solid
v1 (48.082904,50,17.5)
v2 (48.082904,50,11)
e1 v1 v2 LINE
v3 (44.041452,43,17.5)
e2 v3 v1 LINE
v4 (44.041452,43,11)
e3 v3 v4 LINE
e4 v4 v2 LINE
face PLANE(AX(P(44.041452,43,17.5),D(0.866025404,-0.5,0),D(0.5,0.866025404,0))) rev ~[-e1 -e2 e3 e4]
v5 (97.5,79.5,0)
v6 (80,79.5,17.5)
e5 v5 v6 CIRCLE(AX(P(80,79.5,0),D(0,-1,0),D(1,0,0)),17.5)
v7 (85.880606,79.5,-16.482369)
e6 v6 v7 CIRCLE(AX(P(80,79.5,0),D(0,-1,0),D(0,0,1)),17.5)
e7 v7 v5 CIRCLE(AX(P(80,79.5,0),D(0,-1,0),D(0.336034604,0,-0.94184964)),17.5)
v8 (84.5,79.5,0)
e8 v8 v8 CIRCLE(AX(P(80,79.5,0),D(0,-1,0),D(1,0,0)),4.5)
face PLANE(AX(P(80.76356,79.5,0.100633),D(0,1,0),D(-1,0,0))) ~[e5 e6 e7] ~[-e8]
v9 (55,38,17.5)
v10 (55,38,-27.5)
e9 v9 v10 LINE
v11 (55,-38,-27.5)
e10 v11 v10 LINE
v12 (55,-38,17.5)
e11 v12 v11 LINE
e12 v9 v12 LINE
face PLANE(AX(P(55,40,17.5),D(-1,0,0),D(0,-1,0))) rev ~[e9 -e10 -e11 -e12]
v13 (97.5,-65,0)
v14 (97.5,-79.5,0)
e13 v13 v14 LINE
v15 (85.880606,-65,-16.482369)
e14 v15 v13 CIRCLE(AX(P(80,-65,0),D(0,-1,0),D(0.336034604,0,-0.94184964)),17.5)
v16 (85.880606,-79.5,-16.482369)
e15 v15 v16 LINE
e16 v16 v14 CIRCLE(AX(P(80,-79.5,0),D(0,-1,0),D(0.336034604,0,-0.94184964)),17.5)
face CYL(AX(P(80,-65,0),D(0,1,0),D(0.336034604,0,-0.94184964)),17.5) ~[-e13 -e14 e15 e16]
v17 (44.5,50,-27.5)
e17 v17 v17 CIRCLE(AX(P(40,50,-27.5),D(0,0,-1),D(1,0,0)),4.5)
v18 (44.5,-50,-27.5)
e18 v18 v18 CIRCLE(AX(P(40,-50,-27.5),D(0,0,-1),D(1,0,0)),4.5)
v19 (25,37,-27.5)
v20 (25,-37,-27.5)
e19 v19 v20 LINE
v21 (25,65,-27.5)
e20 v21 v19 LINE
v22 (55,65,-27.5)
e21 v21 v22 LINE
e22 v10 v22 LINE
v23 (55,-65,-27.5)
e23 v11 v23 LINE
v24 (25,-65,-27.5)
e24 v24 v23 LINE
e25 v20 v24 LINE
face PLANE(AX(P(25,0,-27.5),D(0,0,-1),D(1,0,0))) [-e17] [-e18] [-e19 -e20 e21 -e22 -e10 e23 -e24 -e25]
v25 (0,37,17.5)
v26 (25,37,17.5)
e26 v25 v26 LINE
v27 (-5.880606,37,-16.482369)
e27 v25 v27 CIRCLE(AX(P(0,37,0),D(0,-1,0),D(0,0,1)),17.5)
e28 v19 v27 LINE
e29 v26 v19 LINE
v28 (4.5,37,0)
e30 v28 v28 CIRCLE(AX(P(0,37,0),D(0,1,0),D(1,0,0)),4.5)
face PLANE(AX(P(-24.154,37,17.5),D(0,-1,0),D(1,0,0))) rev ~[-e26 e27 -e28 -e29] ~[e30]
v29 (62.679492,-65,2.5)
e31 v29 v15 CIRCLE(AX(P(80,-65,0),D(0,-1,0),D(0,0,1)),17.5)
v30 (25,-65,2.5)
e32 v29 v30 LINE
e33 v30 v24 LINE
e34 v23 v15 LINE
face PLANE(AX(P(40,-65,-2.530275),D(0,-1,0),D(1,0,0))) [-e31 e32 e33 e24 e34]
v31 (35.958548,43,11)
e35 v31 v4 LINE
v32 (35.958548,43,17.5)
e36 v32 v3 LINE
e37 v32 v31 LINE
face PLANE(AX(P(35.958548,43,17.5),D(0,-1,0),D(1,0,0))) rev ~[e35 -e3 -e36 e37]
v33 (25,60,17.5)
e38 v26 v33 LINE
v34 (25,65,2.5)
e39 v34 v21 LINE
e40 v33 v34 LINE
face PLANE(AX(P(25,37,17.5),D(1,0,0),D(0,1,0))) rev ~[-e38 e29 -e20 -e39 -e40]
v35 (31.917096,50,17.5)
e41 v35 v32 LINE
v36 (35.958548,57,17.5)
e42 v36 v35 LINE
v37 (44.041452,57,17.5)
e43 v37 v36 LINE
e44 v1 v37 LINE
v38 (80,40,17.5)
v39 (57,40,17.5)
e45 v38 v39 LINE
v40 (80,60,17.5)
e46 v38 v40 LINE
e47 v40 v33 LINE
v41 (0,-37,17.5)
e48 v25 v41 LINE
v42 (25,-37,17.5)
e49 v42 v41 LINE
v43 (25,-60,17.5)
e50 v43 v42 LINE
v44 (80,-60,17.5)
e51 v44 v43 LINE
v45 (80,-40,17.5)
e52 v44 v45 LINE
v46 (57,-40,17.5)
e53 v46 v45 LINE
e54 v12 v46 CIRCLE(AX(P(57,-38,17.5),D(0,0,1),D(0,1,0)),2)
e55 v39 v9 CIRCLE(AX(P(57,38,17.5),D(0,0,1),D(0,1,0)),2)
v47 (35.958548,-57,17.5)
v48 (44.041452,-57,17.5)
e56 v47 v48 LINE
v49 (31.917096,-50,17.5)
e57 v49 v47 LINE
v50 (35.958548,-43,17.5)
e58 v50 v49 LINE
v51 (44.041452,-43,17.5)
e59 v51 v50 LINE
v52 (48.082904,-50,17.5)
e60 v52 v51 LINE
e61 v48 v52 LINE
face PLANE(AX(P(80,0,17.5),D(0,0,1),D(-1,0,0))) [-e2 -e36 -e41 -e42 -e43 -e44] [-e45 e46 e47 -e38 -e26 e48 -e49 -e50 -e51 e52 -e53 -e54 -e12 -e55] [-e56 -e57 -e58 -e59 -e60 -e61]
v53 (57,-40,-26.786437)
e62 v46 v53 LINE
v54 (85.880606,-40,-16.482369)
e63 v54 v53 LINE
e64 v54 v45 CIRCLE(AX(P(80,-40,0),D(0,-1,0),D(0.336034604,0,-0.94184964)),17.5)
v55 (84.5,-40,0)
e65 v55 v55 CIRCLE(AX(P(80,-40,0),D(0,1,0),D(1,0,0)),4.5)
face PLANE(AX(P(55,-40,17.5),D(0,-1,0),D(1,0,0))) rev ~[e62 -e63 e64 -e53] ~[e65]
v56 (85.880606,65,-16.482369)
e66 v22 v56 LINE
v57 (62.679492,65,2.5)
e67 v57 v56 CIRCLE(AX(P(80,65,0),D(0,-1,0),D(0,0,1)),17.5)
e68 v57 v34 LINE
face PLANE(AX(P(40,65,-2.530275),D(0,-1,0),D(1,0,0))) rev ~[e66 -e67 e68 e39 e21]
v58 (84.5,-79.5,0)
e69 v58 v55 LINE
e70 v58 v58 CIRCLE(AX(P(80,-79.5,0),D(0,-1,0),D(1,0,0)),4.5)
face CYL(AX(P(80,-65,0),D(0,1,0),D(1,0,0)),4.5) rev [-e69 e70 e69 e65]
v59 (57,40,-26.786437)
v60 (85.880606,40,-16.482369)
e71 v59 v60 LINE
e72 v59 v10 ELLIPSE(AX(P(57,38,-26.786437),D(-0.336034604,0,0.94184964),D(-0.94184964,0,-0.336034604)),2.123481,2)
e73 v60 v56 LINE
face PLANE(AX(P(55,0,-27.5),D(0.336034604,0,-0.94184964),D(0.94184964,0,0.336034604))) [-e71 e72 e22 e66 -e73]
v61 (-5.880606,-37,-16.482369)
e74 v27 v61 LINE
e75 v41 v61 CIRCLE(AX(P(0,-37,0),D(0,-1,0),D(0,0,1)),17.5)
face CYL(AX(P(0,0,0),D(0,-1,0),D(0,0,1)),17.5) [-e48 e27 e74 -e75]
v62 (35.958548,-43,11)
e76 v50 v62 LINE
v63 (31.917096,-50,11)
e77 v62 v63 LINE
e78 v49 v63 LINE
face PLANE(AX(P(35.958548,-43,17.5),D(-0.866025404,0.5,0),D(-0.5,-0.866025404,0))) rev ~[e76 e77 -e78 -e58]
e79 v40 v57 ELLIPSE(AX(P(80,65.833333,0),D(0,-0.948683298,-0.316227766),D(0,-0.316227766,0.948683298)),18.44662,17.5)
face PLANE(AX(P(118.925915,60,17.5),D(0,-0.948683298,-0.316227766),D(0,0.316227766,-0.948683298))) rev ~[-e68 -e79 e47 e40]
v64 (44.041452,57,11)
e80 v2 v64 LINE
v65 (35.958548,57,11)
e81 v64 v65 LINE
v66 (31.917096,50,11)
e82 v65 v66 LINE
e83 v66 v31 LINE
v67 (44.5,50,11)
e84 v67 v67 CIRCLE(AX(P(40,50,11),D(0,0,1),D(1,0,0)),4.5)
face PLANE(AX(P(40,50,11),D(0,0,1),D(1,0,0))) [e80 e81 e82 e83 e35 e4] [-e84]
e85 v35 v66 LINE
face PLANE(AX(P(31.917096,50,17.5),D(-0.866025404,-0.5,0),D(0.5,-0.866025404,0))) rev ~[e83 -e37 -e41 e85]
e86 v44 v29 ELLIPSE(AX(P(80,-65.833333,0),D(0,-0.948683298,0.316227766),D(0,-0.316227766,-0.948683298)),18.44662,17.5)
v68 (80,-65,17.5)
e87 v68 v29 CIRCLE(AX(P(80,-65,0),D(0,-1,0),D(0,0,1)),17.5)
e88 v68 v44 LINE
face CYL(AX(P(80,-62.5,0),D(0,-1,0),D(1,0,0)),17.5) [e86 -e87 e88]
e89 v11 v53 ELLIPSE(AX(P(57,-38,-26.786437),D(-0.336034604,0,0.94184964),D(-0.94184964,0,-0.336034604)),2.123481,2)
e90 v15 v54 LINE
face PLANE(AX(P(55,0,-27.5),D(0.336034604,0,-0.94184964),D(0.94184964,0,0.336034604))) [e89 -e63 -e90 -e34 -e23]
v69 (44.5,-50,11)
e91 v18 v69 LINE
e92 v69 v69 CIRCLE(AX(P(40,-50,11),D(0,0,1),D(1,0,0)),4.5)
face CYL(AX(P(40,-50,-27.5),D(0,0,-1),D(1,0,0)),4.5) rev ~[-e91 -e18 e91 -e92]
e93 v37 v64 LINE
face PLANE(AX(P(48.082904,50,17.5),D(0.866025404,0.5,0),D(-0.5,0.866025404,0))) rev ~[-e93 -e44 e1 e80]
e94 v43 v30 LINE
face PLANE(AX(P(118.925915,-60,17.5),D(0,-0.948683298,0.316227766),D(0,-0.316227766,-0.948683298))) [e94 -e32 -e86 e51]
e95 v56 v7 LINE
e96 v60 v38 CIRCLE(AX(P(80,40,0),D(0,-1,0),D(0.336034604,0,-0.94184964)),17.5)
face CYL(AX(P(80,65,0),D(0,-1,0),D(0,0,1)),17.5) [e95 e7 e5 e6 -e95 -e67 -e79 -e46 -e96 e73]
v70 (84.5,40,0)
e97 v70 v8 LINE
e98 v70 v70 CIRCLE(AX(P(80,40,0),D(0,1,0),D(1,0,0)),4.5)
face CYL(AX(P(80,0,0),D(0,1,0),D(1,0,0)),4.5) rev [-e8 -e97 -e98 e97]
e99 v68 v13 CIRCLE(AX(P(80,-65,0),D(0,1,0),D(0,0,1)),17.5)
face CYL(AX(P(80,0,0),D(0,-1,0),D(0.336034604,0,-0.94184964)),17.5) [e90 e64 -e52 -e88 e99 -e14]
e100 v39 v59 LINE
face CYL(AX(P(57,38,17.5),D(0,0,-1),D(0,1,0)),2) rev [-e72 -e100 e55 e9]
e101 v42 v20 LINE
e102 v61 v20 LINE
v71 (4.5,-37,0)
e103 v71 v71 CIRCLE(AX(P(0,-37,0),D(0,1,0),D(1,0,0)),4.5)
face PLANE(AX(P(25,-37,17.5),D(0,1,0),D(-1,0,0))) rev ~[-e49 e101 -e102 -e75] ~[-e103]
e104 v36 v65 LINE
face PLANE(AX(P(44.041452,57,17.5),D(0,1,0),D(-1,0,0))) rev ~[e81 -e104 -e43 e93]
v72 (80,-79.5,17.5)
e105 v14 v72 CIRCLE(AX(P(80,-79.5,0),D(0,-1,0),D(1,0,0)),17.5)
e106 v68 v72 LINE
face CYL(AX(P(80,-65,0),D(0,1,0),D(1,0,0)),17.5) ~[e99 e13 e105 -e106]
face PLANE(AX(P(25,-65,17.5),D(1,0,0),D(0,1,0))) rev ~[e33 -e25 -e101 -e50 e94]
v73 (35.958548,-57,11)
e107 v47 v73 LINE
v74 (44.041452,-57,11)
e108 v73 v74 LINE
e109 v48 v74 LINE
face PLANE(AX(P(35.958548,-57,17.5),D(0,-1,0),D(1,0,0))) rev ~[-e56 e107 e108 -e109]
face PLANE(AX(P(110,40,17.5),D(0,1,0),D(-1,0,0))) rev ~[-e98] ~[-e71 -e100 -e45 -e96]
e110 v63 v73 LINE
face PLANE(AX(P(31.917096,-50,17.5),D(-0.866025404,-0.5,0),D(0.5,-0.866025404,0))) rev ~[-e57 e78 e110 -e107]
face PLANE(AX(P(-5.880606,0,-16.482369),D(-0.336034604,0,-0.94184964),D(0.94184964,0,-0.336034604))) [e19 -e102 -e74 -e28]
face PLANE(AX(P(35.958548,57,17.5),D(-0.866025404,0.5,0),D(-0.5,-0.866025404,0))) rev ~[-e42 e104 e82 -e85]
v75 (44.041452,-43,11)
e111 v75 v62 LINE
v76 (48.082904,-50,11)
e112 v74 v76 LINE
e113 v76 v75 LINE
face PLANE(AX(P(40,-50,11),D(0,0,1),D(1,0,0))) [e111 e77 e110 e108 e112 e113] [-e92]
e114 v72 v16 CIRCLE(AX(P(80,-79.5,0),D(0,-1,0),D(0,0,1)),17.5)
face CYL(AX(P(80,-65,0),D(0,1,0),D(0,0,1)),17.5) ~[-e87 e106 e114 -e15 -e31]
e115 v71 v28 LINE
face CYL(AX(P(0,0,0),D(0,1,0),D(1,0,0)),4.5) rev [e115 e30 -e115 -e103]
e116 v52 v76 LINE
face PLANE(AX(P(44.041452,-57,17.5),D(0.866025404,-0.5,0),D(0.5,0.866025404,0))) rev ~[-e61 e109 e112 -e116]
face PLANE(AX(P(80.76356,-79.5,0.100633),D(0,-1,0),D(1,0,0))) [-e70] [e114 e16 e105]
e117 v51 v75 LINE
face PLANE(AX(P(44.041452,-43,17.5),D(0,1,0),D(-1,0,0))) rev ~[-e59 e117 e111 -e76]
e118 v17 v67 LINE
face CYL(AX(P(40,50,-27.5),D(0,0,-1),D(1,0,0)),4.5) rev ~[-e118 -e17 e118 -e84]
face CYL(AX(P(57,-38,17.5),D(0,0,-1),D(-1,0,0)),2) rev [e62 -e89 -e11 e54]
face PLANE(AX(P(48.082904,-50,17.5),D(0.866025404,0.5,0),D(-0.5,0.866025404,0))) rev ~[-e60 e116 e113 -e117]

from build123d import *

# Parameters (mm, degrees)
F0_R          = 4.5
F1_DEPTH      = 65
F2_W          = 24.1539999843
F2_H          = 28
F2_W_2        = 25
F2_W_3        = 30
F2_H_2        = 80
F3_DEPTH      = 45.001
F4_R          = 4.5
F5_DEPTH      = 45.001
F6_R          = 4.5
F7_DEPTH      = 6.5
F8_R          = 4.5
F9_DEPTH      = 14.5
F10_T4_DEPTH  = 132.8518303197
F10_S5_R      = 17.5
F10_T6_DEPTH  = 68
F10_T10_DEPTH = 132.8518303197
F10_S11_R     = 17.5
F10_T12_DEPTH = 68
F11_R         = 2


# Not quite as in the source:
# - a fillet or chamfer that OpenCascade refuses, or shapes differently, is made with other operations: its cross-section is extruded or revolved along the edge and cut away or added
# - a pattern or mirror of a feature is missing from the dataset's text; its kind, count and spacing are read off the source's solid


with BuildPart() as f1:
    # F0 (on Front) → F1 (new body, symmetric)
    with BuildSketch(Plane.XZ):
        with BuildLine():
            Line((80, 17.5), (0, 17.5))
            ThreePointArc((0, 17.5), (-17.2437155554, 2.9840029898), (-5.880605574, -16.4823687036))
            Line((-5.880605574, -16.4823687036), (25, -27.5))
            Line((25, -27.5), (55, -27.5))
            Line((55, -27.5), (85.880605574, -16.4823687036))
            ThreePointArc((85.880605574, -16.4823687036), (97.2437155554, 2.9840029898), (80, 17.5))
        make_face()
        Circle(F0_R, mode=Mode.SUBTRACT)
        with Locations((80, 0)):
            Circle(F0_R, mode=Mode.SUBTRACT)
    extrude(amount=F1_DEPTH, both=True)

    # F2 (on face) → F3 (cut, through all)
    with BuildSketch(Plane.XY.offset(17.5)):
        with Locations((-12.0769999921, 51)):
            Rectangle(F2_W, F2_H)
        with Locations((12.5, 51)):
            Rectangle(F2_W_2, F2_H)
        with Locations((-12.0769999921, -51)):
            Rectangle(F2_W, F2_H)
        with Locations((12.5, -51)):
            Rectangle(F2_W_2, F2_H)
        Polygon((55, 40), (55, 0), (55, -40), (80, -40), (80, 40), align=None)
        with Locations((95, 0)):
            Rectangle(F2_W_3, F2_H_2)
    extrude(amount=-F3_DEPTH, mode=Mode.SUBTRACT)

    # F4 (on face) → F5 (cut, through all)
    with BuildSketch(Plane(origin=(0, 0, -27.5), x_dir=(1, 0, 0), z_dir=(0, 0, -1))):
        with Locations((40, 50)):
            Circle(F4_R)
        with Locations((40, -50)):
            Circle(F4_R)
    extrude(amount=-F5_DEPTH, mode=Mode.SUBTRACT)

    # F6 (on face) → F7 (cut)
    with BuildSketch(Plane.XY.offset(17.5)):
        Polygon((35.9585481157, 43), (44.0414518843, 43), (48.0829037687, 50), (44.0414518843, 57), (35.9585481157, 57), (31.9170962313, 50), align=None)
        with Locations((40, 50)):
            Circle(F6_R, mode=Mode.SUBTRACT)
        Polygon((44.0414518843, -57), (48.0829037687, -50), (44.0414518843, -43), (35.9585481157, -43), (31.9170962313, -50), (35.9585481157, -57), align=None)
        with Locations((40, -50)):
            Circle(F6_R, mode=Mode.SUBTRACT)
    extrude(amount=-F7_DEPTH, mode=Mode.SUBTRACT)

    # F8 (on face) → F9 (join)
    with BuildSketch(Plane.XZ.offset(65)):
        with BuildLine():
            ThreePointArc((85.880605574, -16.4823687036), (94.3031569513, -10.0831394529), (97.5, 0))
            ThreePointArc((97.5, 0), (92.3743686708, 12.3743686708), (80, 17.5))
            ThreePointArc((80, 17.5), (62.7562844446, -2.9840029898), (85.880605574, -16.4823687036))
        make_face()
        with Locations((80, 0)):
            Circle(F8_R, mode=Mode.SUBTRACT)
    f9 = extrude(amount=F9_DEPTH)

    # F9_copies: F9 across plane
    add(f9.mirror(Plane.ZX))

    # F10: chamfer of 5 x 15 on 2 edges, made by hand


with BuildPart() as f10_tool2:
    # F10_s3 → F10_t4 (new body)
    with BuildSketch(Plane.YZ.offset(118.9259151598)):
        Polygon((-60, 17.5), (-65, 2.5), (-65, 17.5), align=None)
    extrude(amount=-F10_T4_DEPTH)

    # F10_s5 → F10_t6 (cut, symmetric)
    with BuildSketch(Plane.XZ.offset(62.5)):
        with Locations((80, 0)):
            Circle(F10_S5_R)
    extrude(amount=F10_T6_DEPTH, both=True, mode=Mode.SUBTRACT)


with BuildPart() as f1_1:
    add(f1.part)

    # F10_t1: cut F10_tool2
    add(f10_tool2.part, mode=Mode.SUBTRACT)


with BuildPart() as f10_tool8:
    # F10_s9 → F10_t10 (new body)
    with BuildSketch(Plane.YZ.offset(118.9259151598)):
        Polygon((60, 17.5), (65, 2.5), (65, 17.5), align=None)
    extrude(amount=-F10_T10_DEPTH)

    # F10_s11 → F10_t12 (cut, symmetric)
    with BuildSketch(Plane.XZ.offset(-62.5)):
        with Locations((80, 0)):
            Circle(F10_S11_R)
    extrude(amount=F10_T12_DEPTH, both=True, mode=Mode.SUBTRACT)


with BuildPart() as f1_2:
    add(f1_1.part)

    # F10_t7: cut F10_tool8
    add(f10_tool8.part, mode=Mode.SUBTRACT)

    # F11
    f11_edges = [f1_2.edges().sort_by_distance(p)[0] for p in [
        (55, -40, -5),
        (55, 40, -5),
    ]]
    fillet(f11_edges, radius=F11_R)


solid = f1_2.part
